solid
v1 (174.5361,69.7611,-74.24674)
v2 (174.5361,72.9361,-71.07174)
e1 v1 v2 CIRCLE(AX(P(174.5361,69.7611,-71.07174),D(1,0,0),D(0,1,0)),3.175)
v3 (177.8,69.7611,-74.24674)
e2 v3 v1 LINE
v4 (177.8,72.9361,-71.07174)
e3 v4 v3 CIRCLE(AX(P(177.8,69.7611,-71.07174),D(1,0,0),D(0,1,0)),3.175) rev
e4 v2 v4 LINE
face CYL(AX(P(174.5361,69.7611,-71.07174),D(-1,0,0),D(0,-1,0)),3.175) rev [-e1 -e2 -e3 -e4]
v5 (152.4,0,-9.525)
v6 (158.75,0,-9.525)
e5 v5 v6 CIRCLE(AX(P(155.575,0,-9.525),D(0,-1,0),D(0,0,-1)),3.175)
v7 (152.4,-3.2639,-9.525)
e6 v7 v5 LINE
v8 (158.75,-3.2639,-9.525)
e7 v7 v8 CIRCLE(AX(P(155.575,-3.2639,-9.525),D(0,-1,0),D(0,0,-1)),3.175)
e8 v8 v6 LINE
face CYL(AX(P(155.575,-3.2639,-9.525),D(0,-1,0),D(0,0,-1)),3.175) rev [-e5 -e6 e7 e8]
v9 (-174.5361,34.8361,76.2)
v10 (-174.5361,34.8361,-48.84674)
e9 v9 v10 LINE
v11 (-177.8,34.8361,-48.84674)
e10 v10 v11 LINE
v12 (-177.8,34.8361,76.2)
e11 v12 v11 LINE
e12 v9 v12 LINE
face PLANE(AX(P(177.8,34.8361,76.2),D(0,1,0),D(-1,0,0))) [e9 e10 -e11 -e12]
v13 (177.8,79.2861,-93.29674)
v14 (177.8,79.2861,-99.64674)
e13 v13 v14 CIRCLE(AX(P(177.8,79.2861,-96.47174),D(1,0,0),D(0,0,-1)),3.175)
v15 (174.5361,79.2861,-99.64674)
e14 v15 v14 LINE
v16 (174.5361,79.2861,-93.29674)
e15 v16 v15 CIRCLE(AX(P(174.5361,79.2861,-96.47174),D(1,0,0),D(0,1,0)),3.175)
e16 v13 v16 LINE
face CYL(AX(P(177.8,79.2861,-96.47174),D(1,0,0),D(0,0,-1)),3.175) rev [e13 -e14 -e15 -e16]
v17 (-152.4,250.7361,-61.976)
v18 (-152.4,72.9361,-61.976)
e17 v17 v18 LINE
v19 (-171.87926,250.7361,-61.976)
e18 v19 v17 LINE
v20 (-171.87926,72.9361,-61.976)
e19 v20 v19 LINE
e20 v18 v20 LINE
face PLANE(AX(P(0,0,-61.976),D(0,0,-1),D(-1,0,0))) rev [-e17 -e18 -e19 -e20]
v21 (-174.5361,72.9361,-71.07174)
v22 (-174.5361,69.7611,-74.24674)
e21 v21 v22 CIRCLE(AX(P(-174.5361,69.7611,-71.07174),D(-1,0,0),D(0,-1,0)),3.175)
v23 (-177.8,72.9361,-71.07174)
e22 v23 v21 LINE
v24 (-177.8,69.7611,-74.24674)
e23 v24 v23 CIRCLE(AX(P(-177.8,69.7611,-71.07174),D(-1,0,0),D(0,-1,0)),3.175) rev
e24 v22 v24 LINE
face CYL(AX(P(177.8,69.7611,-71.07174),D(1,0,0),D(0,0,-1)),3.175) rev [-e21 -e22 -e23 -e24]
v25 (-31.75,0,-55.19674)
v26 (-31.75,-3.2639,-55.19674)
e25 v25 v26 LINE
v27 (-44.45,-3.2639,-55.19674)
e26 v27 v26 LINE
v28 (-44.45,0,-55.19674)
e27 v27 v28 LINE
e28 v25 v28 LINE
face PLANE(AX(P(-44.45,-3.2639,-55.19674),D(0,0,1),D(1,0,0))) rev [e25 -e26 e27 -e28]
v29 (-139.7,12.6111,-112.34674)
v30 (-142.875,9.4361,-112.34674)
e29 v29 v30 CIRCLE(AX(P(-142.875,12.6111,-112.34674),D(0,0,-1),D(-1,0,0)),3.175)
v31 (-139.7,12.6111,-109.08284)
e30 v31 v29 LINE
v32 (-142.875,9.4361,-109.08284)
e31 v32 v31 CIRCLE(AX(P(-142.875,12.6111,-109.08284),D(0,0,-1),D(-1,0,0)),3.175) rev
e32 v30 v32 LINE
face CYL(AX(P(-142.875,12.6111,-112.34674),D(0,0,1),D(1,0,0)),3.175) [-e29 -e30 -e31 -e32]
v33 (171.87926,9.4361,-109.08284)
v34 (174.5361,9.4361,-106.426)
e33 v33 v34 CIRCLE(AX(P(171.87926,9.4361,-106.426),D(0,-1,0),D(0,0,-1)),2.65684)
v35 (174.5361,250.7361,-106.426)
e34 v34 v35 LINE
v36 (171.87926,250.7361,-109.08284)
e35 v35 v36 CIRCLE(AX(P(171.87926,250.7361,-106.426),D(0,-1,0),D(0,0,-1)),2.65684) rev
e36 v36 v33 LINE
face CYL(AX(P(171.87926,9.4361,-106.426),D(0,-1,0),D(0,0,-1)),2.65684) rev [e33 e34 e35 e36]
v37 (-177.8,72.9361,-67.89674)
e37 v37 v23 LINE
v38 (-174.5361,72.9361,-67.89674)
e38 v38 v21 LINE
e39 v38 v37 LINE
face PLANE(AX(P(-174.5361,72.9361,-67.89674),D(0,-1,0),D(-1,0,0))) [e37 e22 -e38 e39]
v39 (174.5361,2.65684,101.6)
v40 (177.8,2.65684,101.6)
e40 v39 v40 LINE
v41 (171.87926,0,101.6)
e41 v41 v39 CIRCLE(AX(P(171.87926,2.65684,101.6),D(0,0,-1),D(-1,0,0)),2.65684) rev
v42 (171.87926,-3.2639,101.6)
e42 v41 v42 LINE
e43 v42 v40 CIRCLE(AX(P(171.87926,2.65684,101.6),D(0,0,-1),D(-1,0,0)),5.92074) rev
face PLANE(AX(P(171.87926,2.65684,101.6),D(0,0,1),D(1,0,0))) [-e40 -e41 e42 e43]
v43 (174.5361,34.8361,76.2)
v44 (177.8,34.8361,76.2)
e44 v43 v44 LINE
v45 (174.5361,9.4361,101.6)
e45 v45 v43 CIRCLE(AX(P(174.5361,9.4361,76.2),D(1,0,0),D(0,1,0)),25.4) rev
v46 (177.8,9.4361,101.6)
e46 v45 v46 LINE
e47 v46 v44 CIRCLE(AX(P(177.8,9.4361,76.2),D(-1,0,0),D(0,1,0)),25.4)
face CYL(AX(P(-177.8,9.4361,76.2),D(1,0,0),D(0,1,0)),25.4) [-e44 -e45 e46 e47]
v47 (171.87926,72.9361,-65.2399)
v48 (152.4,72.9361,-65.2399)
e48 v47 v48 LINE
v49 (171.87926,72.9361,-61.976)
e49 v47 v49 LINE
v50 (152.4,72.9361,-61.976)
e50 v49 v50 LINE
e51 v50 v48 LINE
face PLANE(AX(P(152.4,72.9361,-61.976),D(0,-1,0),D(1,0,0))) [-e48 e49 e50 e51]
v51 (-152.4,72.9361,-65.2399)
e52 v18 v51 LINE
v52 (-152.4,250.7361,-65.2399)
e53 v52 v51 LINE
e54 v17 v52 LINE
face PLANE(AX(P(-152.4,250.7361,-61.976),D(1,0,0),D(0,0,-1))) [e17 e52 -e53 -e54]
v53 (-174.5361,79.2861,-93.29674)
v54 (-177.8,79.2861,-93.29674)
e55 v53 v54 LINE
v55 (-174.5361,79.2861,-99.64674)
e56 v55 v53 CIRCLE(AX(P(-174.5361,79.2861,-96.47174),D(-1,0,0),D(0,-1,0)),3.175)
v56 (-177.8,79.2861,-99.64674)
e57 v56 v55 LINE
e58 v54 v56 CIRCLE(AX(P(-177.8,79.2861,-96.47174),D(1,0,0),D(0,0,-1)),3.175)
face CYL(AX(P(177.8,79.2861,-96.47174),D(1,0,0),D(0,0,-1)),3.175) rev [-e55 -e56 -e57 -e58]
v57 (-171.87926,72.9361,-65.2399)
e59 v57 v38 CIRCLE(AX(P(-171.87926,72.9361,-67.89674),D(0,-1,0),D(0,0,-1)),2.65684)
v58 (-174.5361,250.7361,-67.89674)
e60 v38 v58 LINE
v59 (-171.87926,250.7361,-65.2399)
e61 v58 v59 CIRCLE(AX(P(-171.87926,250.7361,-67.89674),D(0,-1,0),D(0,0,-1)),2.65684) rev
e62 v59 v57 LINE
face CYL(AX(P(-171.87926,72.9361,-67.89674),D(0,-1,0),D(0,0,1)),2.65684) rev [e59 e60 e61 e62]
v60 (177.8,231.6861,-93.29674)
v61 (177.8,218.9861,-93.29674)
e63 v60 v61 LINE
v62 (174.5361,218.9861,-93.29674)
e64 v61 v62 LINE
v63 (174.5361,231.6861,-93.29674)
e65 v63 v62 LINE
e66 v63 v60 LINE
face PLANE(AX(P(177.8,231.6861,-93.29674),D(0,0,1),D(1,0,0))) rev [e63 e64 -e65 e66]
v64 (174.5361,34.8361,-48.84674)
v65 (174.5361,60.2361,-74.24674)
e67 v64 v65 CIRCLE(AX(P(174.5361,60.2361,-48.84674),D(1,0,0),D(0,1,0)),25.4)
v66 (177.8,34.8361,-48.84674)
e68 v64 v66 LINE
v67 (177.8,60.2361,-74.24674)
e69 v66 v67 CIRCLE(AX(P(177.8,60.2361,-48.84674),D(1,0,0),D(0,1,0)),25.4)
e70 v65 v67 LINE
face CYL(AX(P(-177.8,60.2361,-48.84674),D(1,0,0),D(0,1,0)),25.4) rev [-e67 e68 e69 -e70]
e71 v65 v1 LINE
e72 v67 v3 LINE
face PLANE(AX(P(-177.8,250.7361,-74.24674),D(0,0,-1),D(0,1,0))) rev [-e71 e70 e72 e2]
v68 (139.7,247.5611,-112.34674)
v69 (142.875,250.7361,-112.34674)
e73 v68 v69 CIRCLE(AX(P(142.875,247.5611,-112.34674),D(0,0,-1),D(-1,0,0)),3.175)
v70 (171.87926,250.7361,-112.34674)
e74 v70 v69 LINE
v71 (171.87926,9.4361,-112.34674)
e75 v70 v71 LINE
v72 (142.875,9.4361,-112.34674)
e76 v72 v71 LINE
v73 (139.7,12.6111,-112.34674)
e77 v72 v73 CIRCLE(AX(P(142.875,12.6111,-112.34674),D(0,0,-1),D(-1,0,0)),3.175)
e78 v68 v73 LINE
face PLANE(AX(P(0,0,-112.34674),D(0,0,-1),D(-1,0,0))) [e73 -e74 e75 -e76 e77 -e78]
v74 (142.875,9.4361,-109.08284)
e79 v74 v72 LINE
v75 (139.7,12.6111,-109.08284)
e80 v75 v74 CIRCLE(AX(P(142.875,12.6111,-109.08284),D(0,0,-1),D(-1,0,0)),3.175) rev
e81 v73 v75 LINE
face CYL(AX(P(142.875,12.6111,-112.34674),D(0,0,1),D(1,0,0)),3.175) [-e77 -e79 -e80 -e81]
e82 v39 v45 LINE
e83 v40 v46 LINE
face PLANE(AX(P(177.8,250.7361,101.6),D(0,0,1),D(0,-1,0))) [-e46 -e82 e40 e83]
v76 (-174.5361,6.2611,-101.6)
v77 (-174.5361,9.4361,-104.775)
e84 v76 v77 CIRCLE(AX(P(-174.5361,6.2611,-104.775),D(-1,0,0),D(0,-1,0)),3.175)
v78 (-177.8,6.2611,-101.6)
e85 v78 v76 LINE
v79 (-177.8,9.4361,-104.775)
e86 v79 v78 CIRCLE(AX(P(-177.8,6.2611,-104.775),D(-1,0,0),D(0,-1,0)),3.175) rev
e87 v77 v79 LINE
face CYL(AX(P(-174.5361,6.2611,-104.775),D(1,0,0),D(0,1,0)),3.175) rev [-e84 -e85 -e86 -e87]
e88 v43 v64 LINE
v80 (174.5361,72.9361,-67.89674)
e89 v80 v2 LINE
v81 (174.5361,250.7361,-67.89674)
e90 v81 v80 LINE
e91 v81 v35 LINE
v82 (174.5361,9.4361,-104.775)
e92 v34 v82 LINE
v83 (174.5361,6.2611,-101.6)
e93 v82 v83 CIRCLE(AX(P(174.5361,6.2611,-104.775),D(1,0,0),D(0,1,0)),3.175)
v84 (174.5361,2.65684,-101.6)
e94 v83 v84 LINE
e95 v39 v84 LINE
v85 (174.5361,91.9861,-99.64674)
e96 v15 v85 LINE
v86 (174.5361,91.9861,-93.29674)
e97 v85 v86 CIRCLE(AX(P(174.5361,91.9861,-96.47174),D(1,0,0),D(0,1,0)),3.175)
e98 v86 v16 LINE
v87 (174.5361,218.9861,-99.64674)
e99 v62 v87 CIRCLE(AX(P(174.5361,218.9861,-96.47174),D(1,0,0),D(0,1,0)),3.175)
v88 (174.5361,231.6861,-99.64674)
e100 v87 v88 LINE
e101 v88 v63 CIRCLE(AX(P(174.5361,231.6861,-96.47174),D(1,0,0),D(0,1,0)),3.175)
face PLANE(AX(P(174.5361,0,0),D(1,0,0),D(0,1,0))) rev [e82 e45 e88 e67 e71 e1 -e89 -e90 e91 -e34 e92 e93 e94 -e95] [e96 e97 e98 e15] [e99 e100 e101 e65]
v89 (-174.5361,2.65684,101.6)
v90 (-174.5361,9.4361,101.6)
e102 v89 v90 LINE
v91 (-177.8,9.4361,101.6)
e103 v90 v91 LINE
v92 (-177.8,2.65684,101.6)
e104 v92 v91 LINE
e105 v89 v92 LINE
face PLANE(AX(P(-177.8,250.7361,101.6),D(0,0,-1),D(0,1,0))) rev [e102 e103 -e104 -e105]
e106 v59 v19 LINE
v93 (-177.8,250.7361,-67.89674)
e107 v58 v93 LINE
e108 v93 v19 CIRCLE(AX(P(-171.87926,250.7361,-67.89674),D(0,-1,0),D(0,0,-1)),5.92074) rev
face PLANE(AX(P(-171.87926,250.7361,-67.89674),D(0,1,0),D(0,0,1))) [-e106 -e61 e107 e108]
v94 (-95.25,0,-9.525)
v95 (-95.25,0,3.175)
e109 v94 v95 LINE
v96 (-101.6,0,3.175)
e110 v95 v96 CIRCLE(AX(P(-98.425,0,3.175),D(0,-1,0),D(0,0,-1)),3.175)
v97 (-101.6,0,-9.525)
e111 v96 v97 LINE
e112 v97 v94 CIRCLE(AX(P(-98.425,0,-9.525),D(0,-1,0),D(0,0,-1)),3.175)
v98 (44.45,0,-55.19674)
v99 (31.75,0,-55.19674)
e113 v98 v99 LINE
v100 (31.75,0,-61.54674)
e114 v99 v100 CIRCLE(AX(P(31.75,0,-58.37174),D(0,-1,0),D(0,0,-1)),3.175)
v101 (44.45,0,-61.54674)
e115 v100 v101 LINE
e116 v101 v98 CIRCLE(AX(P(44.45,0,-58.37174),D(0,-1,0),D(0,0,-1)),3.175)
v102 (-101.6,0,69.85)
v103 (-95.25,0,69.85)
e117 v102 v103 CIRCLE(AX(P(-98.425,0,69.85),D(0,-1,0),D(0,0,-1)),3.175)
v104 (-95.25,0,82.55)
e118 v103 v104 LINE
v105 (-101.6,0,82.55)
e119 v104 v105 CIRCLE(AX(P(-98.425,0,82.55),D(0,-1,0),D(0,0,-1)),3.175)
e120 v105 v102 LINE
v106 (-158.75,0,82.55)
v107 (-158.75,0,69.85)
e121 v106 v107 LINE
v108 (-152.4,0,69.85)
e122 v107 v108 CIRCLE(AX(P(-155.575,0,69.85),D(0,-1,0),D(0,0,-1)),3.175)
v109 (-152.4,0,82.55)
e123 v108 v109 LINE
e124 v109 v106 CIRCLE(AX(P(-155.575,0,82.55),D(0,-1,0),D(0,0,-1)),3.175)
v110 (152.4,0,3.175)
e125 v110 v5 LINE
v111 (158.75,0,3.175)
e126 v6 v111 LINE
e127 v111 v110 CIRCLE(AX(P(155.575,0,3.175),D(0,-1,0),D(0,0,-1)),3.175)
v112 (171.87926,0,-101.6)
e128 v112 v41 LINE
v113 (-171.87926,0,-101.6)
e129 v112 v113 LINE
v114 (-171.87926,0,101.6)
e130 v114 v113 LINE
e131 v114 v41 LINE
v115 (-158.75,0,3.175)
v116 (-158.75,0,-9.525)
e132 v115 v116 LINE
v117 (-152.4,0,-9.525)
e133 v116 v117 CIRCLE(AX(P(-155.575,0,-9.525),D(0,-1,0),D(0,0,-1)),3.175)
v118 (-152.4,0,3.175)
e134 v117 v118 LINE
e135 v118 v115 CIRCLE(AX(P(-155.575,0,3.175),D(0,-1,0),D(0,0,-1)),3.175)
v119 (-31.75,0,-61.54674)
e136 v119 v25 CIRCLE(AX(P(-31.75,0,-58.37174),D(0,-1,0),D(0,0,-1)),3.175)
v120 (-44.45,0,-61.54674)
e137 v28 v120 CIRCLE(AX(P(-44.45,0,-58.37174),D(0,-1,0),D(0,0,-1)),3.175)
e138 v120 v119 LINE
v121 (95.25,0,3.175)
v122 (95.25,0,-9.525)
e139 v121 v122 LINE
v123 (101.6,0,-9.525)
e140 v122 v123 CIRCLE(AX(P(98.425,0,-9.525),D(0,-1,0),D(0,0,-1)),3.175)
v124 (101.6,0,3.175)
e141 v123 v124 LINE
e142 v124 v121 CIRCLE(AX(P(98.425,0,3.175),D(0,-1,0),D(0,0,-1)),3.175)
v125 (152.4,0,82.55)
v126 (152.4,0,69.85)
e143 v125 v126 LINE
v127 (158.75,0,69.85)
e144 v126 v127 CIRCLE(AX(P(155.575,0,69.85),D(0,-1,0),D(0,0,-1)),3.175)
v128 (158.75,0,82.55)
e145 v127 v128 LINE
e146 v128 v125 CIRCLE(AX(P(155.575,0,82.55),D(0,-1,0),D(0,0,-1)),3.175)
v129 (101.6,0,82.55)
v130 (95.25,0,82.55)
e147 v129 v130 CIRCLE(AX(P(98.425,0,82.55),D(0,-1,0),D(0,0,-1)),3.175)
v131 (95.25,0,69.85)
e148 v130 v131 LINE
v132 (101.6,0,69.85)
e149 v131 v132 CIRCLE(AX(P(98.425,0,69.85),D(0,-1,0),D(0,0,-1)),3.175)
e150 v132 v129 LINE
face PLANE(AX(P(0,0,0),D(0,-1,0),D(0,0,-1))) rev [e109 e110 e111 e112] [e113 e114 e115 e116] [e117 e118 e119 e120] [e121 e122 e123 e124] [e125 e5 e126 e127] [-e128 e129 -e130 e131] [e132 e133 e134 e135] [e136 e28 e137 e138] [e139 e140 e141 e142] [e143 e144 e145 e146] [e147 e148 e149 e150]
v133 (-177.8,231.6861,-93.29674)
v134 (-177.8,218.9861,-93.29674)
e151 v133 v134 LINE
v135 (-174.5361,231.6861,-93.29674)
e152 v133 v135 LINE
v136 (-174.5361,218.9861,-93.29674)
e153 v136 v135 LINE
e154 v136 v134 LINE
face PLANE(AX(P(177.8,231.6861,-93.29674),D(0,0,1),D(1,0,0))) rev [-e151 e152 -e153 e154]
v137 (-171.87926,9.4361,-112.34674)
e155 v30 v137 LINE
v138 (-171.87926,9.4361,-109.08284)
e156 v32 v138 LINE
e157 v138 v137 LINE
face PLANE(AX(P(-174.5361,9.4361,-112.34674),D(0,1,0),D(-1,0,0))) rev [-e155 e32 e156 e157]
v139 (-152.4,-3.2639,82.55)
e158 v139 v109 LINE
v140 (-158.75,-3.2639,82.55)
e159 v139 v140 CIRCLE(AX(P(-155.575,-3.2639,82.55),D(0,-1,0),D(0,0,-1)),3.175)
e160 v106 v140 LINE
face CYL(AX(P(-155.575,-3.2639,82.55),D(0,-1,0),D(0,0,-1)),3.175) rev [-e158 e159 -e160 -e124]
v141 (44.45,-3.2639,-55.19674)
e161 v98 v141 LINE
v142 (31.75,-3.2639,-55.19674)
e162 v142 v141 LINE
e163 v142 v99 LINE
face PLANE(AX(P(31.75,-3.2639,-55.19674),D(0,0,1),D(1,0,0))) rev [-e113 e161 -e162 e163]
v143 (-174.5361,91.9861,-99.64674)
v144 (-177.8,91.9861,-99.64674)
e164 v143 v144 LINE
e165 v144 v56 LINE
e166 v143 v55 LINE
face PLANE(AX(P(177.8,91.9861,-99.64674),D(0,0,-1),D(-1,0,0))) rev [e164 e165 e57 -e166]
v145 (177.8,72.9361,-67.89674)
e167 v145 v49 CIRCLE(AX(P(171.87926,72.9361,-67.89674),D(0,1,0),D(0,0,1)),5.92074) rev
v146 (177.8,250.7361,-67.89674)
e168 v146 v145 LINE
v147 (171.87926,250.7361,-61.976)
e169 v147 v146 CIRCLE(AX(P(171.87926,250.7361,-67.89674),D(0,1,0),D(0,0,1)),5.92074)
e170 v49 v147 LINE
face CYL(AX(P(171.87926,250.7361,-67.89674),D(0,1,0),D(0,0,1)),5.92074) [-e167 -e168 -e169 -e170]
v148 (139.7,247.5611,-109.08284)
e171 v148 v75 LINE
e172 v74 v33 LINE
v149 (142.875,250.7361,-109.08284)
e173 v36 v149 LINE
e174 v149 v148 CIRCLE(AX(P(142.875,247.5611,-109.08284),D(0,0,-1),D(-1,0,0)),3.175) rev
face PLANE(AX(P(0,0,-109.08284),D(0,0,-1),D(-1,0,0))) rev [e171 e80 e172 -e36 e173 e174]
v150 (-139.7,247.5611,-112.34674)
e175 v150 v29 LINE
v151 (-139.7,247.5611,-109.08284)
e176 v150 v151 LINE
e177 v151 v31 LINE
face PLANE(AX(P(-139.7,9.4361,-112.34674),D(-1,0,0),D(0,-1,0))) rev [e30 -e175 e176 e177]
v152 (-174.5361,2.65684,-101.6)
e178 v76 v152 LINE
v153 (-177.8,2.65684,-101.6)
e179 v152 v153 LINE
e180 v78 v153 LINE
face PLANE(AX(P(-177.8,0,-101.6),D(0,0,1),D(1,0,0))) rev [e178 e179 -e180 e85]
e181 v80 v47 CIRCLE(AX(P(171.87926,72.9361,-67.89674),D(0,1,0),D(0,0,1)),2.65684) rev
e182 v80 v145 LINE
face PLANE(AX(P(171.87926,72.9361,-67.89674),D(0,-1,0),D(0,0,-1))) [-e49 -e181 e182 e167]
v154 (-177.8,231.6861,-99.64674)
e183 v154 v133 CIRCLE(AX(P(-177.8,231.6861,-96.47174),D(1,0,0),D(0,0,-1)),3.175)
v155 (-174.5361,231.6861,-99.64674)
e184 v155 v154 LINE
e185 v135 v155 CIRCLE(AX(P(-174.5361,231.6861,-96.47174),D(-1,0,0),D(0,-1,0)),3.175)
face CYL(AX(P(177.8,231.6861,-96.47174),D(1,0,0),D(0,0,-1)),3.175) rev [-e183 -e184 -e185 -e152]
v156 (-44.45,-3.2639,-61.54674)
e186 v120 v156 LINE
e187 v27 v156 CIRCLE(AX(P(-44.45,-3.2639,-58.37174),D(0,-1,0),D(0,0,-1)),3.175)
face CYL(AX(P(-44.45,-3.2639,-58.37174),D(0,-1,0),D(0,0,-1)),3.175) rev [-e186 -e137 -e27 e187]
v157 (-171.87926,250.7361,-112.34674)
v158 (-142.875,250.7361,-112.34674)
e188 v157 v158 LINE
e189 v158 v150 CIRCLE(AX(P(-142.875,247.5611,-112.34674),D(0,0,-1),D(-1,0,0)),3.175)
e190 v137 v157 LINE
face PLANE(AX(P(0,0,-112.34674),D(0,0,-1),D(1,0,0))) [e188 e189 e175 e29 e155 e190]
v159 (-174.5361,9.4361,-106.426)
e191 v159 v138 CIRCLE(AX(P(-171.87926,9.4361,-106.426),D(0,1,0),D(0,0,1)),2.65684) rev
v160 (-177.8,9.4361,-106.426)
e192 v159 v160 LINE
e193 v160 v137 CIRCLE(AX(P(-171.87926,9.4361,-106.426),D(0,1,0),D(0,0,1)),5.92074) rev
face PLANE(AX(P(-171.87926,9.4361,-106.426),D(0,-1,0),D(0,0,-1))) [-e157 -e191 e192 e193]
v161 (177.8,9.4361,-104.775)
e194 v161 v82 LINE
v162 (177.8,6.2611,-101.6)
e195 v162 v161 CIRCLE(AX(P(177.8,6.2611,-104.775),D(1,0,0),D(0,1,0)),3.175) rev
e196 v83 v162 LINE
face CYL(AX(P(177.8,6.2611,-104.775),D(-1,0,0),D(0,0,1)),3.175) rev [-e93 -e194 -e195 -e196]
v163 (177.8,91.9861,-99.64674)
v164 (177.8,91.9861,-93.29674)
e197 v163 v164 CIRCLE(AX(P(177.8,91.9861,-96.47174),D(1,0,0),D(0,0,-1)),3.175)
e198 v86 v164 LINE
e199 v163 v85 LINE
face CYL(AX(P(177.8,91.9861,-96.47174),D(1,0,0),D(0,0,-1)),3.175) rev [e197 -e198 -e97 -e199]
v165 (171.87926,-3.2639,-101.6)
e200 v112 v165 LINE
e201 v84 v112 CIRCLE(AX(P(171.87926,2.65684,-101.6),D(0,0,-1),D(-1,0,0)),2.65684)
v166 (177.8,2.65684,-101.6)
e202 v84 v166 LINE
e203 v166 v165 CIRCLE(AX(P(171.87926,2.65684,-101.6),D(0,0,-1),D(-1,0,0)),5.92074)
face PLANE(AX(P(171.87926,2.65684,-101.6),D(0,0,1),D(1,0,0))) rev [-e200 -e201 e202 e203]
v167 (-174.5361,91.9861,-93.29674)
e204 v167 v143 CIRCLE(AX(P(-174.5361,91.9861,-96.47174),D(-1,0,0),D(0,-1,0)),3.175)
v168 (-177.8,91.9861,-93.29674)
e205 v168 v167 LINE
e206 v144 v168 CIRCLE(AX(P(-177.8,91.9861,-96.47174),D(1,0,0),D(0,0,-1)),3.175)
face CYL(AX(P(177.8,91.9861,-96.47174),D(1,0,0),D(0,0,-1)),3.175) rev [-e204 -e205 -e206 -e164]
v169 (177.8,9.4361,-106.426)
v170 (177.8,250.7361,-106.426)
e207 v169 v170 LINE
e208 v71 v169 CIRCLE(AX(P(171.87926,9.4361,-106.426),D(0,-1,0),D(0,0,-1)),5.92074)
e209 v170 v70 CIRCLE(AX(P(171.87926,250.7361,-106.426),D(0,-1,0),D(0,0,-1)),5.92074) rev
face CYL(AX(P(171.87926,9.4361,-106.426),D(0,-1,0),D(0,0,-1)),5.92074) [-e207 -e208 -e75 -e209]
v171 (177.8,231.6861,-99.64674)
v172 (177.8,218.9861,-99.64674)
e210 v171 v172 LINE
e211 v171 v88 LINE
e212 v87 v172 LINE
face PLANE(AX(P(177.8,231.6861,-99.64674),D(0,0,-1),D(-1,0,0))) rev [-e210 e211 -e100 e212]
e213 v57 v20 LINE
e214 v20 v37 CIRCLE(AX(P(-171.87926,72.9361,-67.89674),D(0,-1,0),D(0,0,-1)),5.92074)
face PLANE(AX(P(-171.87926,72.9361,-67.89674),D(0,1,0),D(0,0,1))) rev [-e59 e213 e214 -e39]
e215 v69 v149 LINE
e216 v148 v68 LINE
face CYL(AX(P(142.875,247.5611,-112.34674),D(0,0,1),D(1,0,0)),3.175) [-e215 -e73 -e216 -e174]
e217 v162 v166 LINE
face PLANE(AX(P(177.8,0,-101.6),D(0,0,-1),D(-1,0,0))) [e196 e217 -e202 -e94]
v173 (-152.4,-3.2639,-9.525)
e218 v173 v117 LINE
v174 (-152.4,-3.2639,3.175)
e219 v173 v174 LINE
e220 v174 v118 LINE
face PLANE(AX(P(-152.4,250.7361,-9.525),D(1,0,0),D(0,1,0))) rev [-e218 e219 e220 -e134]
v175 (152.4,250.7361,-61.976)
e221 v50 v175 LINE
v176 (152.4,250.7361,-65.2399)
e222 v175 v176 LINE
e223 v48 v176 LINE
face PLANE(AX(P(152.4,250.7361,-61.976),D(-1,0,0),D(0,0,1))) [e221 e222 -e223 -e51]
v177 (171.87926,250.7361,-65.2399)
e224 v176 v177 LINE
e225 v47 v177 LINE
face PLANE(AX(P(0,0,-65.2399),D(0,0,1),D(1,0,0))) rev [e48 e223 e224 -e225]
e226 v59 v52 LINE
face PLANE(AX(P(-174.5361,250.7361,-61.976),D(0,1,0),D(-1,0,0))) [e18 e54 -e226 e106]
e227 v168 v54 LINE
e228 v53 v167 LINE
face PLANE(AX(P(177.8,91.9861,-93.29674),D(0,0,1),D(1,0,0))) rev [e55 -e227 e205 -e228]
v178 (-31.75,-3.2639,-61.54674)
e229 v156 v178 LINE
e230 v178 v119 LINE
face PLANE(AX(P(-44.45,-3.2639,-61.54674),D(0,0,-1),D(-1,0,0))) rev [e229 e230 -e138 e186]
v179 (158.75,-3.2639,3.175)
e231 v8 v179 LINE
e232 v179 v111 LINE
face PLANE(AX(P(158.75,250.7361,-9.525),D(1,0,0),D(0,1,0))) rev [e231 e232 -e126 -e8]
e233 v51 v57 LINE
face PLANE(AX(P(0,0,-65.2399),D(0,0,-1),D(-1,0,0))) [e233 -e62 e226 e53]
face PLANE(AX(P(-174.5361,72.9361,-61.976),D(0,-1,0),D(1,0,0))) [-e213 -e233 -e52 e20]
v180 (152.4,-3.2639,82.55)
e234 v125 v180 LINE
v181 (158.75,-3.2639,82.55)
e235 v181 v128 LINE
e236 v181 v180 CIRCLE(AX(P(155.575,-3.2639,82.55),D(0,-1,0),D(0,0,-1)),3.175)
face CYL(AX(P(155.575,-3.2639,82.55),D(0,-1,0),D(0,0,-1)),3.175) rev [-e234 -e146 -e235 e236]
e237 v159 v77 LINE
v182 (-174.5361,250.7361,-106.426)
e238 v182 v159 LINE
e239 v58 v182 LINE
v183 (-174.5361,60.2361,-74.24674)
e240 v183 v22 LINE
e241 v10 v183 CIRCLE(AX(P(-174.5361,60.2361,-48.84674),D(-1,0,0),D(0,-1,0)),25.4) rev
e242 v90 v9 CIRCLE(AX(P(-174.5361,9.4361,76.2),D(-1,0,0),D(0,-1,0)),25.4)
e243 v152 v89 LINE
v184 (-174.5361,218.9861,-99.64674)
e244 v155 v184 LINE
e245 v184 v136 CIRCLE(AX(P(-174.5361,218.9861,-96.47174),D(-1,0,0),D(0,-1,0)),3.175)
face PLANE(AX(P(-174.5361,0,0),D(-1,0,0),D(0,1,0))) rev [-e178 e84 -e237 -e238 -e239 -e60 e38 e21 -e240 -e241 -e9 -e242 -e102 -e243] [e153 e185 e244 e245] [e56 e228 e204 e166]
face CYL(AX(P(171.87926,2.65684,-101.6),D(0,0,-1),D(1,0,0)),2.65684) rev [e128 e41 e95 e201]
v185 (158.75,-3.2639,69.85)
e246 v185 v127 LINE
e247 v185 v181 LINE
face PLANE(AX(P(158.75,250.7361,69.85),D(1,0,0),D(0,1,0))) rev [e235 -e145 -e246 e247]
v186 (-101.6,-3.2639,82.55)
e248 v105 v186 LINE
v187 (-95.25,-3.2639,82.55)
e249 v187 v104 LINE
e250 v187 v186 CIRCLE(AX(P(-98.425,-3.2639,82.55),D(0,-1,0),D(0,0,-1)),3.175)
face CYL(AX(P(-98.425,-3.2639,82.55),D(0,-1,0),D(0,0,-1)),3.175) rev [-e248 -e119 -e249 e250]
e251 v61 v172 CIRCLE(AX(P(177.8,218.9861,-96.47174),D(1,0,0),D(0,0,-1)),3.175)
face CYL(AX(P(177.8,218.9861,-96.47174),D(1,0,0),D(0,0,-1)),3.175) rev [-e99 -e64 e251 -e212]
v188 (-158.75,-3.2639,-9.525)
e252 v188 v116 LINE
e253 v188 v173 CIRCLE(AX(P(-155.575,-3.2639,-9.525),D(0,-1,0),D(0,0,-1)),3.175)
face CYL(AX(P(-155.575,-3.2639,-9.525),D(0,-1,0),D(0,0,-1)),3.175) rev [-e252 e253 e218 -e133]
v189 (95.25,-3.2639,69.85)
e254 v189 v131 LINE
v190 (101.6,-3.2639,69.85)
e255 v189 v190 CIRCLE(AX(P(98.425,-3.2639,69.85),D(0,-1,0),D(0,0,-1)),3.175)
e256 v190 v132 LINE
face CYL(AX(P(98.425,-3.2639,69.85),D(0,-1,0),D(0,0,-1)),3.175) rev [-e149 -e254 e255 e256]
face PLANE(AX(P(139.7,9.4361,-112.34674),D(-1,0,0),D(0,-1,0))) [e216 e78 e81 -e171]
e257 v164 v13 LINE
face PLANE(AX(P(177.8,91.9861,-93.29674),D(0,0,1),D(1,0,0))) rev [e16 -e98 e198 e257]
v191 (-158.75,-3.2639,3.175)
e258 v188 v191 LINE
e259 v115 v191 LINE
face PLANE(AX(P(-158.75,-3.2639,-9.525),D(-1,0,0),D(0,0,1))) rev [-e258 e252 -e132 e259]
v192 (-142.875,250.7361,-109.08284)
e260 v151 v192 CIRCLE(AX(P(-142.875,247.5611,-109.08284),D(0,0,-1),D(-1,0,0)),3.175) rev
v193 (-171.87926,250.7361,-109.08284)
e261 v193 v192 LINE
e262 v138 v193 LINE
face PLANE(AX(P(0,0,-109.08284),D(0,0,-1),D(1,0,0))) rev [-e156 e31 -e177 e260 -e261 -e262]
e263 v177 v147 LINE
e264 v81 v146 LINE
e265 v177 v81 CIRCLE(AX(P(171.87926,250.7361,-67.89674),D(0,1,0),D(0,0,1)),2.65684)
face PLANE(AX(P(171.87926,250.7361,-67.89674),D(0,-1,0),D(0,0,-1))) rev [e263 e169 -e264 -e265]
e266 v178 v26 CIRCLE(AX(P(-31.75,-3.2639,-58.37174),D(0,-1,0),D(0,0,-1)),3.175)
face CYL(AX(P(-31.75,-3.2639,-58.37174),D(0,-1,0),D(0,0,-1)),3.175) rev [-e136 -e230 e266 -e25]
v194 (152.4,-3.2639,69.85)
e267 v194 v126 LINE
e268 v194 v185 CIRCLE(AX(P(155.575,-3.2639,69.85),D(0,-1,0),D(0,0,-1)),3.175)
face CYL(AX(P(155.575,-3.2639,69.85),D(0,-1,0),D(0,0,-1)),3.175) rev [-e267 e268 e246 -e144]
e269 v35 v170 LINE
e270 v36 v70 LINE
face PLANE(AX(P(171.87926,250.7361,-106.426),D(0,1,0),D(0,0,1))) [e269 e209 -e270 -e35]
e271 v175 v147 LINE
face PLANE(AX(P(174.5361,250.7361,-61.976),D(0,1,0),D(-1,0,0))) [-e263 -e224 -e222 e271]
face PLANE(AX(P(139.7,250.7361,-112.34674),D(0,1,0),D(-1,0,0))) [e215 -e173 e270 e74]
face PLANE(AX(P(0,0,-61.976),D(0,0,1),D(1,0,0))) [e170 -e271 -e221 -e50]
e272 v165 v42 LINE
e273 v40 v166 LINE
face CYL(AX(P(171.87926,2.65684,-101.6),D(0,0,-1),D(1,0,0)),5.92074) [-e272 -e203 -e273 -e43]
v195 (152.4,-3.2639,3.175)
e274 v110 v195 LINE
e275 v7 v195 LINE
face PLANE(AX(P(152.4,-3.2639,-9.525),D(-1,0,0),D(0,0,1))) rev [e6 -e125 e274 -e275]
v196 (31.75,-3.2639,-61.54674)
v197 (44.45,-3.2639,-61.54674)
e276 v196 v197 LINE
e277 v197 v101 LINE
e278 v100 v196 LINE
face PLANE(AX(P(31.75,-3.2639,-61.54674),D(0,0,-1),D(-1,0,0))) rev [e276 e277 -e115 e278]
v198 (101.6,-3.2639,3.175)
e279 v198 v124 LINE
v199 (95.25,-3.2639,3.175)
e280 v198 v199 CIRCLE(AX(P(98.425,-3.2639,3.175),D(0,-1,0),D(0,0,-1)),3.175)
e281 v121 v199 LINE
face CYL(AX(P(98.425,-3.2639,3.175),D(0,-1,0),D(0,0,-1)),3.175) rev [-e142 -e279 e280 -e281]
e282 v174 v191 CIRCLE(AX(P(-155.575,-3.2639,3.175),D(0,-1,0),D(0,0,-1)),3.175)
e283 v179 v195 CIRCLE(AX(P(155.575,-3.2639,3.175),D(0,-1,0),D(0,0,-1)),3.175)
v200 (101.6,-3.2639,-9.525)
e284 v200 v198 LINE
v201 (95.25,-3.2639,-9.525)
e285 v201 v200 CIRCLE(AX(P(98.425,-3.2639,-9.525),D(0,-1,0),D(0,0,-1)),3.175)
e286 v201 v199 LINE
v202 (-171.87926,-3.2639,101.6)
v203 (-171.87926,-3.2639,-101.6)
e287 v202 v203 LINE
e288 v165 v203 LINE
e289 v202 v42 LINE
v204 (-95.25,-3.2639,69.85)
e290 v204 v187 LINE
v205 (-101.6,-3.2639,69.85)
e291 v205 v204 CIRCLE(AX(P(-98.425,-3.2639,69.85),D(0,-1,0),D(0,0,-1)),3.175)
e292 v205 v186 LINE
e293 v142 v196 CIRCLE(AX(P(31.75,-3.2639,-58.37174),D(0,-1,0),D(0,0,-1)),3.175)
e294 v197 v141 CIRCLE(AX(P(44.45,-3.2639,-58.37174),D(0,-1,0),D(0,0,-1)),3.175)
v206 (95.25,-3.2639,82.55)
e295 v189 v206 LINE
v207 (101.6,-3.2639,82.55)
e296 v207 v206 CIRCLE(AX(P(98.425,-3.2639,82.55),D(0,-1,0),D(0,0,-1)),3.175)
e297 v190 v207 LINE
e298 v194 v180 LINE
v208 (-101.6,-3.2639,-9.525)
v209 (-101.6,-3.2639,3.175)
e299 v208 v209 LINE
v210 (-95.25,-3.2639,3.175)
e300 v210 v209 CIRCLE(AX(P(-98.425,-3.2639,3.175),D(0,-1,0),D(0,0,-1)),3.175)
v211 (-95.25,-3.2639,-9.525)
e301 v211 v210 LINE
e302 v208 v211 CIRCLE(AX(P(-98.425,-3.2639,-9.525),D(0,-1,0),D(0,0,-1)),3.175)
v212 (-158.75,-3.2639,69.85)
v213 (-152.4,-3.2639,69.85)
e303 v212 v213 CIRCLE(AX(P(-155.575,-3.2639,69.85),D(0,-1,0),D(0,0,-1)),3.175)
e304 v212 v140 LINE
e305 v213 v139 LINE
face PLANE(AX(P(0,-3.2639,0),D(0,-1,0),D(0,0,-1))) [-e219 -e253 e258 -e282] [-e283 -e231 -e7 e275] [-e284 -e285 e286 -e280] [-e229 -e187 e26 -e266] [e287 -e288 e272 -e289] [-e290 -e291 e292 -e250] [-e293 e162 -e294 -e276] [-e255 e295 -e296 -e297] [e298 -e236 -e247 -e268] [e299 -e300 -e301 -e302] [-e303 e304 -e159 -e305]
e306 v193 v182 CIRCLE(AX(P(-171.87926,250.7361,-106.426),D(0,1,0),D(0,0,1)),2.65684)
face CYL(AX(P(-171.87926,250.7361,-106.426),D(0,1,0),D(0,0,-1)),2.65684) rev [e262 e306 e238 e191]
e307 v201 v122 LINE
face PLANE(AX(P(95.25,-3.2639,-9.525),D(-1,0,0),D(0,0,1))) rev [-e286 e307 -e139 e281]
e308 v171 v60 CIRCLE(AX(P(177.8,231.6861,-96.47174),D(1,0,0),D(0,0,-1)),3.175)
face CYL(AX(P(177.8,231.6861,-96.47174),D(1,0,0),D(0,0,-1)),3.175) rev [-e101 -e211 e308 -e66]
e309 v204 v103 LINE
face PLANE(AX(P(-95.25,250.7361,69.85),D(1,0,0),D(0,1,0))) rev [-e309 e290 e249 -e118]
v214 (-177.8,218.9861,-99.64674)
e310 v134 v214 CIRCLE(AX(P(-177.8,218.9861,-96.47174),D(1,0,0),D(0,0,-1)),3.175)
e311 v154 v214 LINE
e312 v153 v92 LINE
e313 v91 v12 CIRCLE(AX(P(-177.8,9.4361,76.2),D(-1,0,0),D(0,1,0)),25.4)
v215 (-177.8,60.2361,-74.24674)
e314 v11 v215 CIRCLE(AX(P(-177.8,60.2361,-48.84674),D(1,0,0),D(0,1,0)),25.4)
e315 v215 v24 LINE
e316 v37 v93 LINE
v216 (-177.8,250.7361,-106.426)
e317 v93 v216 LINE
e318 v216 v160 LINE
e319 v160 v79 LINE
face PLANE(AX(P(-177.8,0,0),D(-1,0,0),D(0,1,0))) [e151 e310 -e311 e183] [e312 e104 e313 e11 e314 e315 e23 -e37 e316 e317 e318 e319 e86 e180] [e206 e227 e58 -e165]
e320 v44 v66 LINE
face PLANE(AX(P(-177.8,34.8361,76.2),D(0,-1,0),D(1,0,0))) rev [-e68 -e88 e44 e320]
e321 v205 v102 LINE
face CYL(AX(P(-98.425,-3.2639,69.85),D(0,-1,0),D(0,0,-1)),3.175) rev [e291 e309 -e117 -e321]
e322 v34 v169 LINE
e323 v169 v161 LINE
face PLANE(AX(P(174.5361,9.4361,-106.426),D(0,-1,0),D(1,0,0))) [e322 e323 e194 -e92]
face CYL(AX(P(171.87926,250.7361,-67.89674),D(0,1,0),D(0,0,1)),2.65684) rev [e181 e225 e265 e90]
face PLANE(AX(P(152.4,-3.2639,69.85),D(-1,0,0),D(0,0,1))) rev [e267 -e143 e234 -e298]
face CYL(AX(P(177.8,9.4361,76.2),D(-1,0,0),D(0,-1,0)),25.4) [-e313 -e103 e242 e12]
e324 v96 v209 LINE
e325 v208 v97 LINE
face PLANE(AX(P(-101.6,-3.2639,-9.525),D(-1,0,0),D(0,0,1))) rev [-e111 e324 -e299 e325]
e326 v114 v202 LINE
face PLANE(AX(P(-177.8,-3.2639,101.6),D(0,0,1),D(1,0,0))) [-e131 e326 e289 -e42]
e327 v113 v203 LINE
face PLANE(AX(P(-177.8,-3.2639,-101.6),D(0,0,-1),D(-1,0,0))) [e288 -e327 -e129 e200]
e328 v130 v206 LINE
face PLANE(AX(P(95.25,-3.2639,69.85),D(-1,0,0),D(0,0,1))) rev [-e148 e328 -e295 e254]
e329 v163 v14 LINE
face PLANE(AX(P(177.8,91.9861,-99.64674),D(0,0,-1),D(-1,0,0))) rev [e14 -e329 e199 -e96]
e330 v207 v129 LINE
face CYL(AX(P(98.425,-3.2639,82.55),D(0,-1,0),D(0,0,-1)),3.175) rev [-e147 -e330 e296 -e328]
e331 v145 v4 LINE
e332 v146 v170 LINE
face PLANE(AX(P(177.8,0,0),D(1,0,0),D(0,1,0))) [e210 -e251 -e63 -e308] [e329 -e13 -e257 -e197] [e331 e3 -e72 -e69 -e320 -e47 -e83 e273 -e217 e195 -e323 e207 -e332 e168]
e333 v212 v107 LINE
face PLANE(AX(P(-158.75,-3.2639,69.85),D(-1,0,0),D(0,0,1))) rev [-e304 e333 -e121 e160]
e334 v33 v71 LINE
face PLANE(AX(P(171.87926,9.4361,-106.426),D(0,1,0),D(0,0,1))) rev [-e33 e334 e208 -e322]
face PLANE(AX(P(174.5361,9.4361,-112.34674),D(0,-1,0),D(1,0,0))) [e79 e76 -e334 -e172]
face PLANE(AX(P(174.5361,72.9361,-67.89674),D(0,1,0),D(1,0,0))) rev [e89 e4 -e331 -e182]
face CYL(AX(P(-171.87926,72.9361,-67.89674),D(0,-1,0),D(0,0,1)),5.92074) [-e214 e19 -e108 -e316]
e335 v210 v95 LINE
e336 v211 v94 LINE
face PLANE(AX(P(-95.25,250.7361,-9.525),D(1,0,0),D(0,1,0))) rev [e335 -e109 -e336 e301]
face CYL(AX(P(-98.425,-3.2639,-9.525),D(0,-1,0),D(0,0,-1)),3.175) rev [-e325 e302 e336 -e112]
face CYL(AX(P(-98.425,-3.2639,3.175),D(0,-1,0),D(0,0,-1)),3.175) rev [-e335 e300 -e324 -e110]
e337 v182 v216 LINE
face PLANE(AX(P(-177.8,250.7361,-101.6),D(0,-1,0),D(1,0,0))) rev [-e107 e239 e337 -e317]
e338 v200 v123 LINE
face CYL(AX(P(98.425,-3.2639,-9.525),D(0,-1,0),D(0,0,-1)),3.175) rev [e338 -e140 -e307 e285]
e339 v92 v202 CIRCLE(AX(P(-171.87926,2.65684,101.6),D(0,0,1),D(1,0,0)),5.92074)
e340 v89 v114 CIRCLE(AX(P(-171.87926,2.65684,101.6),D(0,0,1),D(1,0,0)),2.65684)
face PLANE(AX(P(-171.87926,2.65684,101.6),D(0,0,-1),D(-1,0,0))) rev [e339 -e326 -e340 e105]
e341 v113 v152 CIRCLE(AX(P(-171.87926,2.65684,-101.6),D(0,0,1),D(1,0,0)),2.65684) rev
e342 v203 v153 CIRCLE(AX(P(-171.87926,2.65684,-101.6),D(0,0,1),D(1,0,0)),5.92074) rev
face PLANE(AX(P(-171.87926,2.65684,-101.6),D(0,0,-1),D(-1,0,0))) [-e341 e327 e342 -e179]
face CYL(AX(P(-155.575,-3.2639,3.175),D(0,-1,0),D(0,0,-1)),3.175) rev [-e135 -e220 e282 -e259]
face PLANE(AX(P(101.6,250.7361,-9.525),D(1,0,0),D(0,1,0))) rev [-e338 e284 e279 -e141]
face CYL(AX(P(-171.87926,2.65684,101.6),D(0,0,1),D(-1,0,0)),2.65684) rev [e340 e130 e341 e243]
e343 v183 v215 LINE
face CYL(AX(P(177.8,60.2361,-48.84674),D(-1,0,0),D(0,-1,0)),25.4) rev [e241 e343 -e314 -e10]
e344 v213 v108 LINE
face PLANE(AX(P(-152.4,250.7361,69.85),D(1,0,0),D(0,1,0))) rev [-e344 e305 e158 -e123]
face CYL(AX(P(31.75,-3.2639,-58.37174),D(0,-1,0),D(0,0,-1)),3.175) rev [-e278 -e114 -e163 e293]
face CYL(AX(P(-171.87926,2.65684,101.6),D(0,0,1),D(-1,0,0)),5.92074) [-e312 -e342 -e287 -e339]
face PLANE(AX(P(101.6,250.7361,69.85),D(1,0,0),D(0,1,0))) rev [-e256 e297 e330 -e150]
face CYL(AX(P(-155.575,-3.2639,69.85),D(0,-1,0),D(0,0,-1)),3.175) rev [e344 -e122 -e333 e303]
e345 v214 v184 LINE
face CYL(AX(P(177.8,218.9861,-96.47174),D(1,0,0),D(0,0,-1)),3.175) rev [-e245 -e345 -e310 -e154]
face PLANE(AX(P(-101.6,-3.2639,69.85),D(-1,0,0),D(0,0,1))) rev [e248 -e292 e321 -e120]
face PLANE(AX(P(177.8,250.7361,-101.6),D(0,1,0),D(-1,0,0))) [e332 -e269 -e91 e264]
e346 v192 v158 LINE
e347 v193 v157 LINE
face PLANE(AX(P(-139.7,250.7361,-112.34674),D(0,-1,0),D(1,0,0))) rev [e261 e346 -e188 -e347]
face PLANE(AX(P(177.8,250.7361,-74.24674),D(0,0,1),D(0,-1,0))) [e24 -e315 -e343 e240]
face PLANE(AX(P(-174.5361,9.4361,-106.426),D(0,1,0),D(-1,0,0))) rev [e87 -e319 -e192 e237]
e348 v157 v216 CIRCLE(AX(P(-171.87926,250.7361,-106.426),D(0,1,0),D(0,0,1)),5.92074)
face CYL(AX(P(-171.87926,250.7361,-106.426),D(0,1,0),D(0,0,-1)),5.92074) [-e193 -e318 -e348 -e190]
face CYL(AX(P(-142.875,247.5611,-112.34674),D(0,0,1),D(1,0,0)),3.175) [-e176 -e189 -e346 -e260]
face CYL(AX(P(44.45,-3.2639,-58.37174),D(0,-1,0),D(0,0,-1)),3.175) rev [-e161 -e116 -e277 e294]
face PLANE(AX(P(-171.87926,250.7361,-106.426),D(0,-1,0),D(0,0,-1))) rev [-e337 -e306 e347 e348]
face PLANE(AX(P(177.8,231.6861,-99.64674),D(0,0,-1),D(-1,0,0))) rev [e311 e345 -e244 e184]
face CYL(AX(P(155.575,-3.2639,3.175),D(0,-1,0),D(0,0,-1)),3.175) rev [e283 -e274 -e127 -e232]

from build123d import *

# Parameters (mm, degrees)
SKETCH1_W                       = 355.6
SKETCH1_H                       = 203.2
BASE_FLANGE1_DEPTH              = 3.2639
EDGE_FLANGE1_STRIP_W            = 18.36928
EDGE_FLANGE1_STRIP_H            = 3.2639
EDGE_FLANGE1_STRIP_CUT_DEPTH    = 203.2
EDGE_FLANGE1_DEPTH              = 203.2
EDGE_FLANGE2_DEPTH              = 241.3
CUT_EXTRUDE1_DEPTH              = 450.37928505
EDGE_FLANGE3_DEPTH              = 177.8
EDGE_FLANGE3_BEND_DEPTH         = 177.8
FILLET1_R                       = 3.175
F_1_4_START                     = -177.8
F_1_4_0_25_DIAMETER_SLOT1_DEPTH = 355.6
F_1_4_START_2                   = -3.2639
F_1_4_0_25_DIAMETER_SLOT2_DEPTH = 3.2639
F_1_4_0_25_DIAMETER_SLOT3_DEPTH = 3.2639


# Read off the part's stored shape, not the designer's step: 1/4 (0.25) Diameter Slot1, 1/4 (0.25) Diameter Slot2, 1/4 (0.25) Diameter Slot3
# Sheet-metal steps are written as plain solids
with BuildPart() as part:
    # Sketch1 → Base-Flange1 (new body)
    with BuildSketch(Plane(origin=(0, 0, 0), x_dir=(1, 0, 0), z_dir=(0, 1, 0))):
        Rectangle(SKETCH1_W, SKETCH1_H)
    extrude(amount=-BASE_FLANGE1_DEPTH)

    # Edge-Flange1 strip (across the edge) → Edge-Flange1 strip cut (cut)
    with BuildSketch(Plane(origin=(177.8, 0, 101.6), x_dir=(-1, 0, 0), z_dir=(0, 0, -1))):
        with Locations((-3.2639, -1.63195)):
            Rectangle(EDGE_FLANGE1_STRIP_W, EDGE_FLANGE1_STRIP_H)
    edge_flange1_strip_cut = extrude(amount=EDGE_FLANGE1_STRIP_CUT_DEPTH, mode=Mode.SUBTRACT)

    # Edge-Flange1 section (across the edge) → Edge-Flange1 (add)
    with BuildSketch(Plane(origin=(177.8, 0, 101.6), x_dir=(-1, 0, 0), z_dir=(0, 0, -1))):
        with BuildLine():
            Line((0, 2.65684), (0, 250.7361))
            Line((0, 250.7361), (3.2639, 250.7361))
            Line((3.2639, 250.7361), (3.2639, 2.65684))
            ThreePointArc((3.2639, 2.65684), (4.042070419, 0.778170419), (5.92074, 0))
            Line((5.92074, 0), (5.92074, -3.2639))
            ThreePointArc((5.92074, -3.2639), (1.734144596, -1.529755404), (0, 2.65684))
        make_face()
    edge_flange1 = extrude(amount=EDGE_FLANGE1_DEPTH)

    # Edge-Flange2 section (across the edge) → Edge-Flange2 (add)
    with BuildSketch(Plane(origin=(174.5361, 250.7361, -109.08284), x_dir=(0, 0, 1), z_dir=(0, -1, 0))):
        with BuildLine():
            Line((-3.2639, 2.65684), (-3.2639, 34.8361))
            Line((-3.2639, 34.8361), (0, 34.8361))
            Line((0, 34.8361), (0, 2.65684))
            ThreePointArc((0, 2.65684), (0.778170419, 0.778170419), (2.65684, 0))
            Line((2.65684, 0), (7.48284, 0))
            Line((7.48284, 0), (7.48284, -3.2639))
            Line((7.48284, -3.2639), (2.65684, -3.2639))
            ThreePointArc((2.65684, -3.2639), (-1.529755404, -1.529755404), (-3.2639, 2.65684))
        make_face()
    edge_flange2 = extrude(amount=EDGE_FLANGE2_DEPTH)

    # Sketch14 → Cut-Extrude1 (cut, through all)
    with BuildSketch(Plane(origin=(177.8, 0, 0), x_dir=(0, 0, -1), z_dir=(1, 0, 0))):
        with BuildLine():
            Line((74.24674, 250.7361), (74.24674, 60.2361))
            ThreePointArc((74.24674, 60.2361), (66.807252242, 42.275587758), (48.84674, 34.8361))
            Line((48.84674, 34.8361), (-76.2, 34.8361))
            ThreePointArc((-76.2, 34.8361), (-94.160512242, 27.396612242), (-101.6, 9.4361))
            Line((-101.6, 9.4361), (-101.6, 250.7361))
            Line((-101.6, 250.7361), (74.24674, 250.7361))
        make_face()
    cut_extrude1 = extrude(amount=-CUT_EXTRUDE1_DEPTH, mode=Mode.SUBTRACT)

    # Mirror1: Edge-Flange1 strip cut, Edge-Flange1, Edge-Flange2, Cut-Extrude1 across plane
    add(edge_flange1_strip_cut.mirror(Plane(origin=(0, 0, 0), x_dir=(0, 0, 1), z_dir=(1, 0, 0))), mode=Mode.SUBTRACT)
    add(edge_flange1.mirror(Plane(origin=(0, 0, 0), x_dir=(0, 0, 1), z_dir=(1, 0, 0))))
    add(edge_flange2.mirror(Plane(origin=(0, 0, 0), x_dir=(0, 0, 1), z_dir=(1, 0, 0))))
    add(cut_extrude1.mirror(Plane(origin=(0, 0, 0), x_dir=(0, 0, 1), z_dir=(1, 0, 0))), mode=Mode.SUBTRACT)

    # Edge-Flange3 section (across the edge) → Edge-Flange3 (add)
    with BuildSketch(Plane(origin=(174.5361, 72.9361, -65.2399), x_dir=(0, 0, -1), z_dir=(0, 1, 0))):
        with BuildLine():
            Line((-3.2639, 2.65684), (-3.2639, 22.1361))
            Line((-3.2639, 22.1361), (0, 22.1361))
            Line((0, 22.1361), (0, 2.65684))
            ThreePointArc((0, 2.65684), (0.778170419, 0.778170419), (2.65684, 0))
            Line((2.65684, 0), (9.00684, 0))
            Line((9.00684, 0), (9.00684, -3.2639))
            Line((9.00684, -3.2639), (2.65684, -3.2639))
            ThreePointArc((2.65684, -3.2639), (-1.529755404, -1.529755404), (-3.2639, 2.65684))
        make_face()
    extrude(amount=EDGE_FLANGE3_DEPTH)

    # Edge-Flange3 section 2 (across the edge) → Edge-Flange3 bend (add)
    with BuildSketch(Plane(origin=(-174.5361, 250.7361, -65.2399), x_dir=(0, 0, -1), z_dir=(0, -1, 0))):
        with BuildLine():
            Line((-3.2639, 2.65684), (-3.2639, 22.1361))
            Line((-3.2639, 22.1361), (0, 22.1361))
            Line((0, 22.1361), (0, 2.65684))
            ThreePointArc((0, 2.65684), (0.778170419, 0.778170419), (2.65684, 0))
            Line((2.65684, 0), (9.00684, 0))
            Line((9.00684, 0), (9.00684, -3.2639))
            Line((9.00684, -3.2639), (2.65684, -3.2639))
            ThreePointArc((2.65684, -3.2639), (-1.529755404, -1.529755404), (-3.2639, 2.65684))
        make_face()
    extrude(amount=EDGE_FLANGE3_BEND_DEPTH)

    # Fillet1
    fillet1_edges = [part.edges().sort_by_distance(p)[0] for p in [
        (-176.16805, 9.4361, -101.6),
        (-139.7, 9.4361, -110.71479),
        (-139.7, 250.7361, -110.71479),
        (176.16805, 72.9361, -74.24674),
        (-176.16805, 72.9361, -74.24674),
        (176.16805, 9.4361, -101.6),
        (139.7, 250.7361, -110.71479),
        (139.7, 9.4361, -110.71479),
    ]]
    fillet(fillet1_edges, radius=FILLET1_R)

    # 1/4 (0.25) Diameter Slot1 outline → 1/4 (0.25) Diameter Slot1 (cut)
    with BuildSketch(Plane.YZ.offset(F_1_4_START)):
        with BuildLine():
            Line((79.2861, -99.64674), (91.9861, -99.64674))
            ThreePointArc((91.9861, -99.64674), (95.1611, -96.47174), (91.9861, -93.29674))
            Line((91.9861, -93.29674), (79.2861, -93.29674))
            ThreePointArc((79.2861, -93.29674), (76.1111, -96.47174), (79.2861, -99.64674))
        make_face()
        with BuildLine():
            ThreePointArc((231.6861, -99.64674), (234.8611, -96.47174), (231.6861, -93.29674))
            Line((231.6861, -93.29674), (218.9861, -93.29674))
            ThreePointArc((218.9861, -93.29674), (215.8111, -96.47174), (218.9861, -99.64674))
            Line((218.9861, -99.64674), (231.6861, -99.64674))
        make_face()
    extrude(amount=F_1_4_0_25_DIAMETER_SLOT1_DEPTH, mode=Mode.SUBTRACT)

    # 1/4 (0.25) Diameter Slot2 outline → 1/4 (0.25) Diameter Slot2 (cut)
    with BuildSketch(Plane(origin=(0, 0, 0), x_dir=(1, 0, 0), z_dir=(0, 1, 0)).offset(F_1_4_START_2)):
        with BuildLine():
            ThreePointArc((95.25, -3.175), (98.425, -6.35), (101.6, -3.175))
            Line((101.6, -3.175), (101.6, 9.525))
            ThreePointArc((101.6, 9.525), (98.425, 12.7), (95.25, 9.525))
            Line((95.25, 9.525), (95.25, -3.175))
        make_face()
        with BuildLine():
            ThreePointArc((101.6, -69.85), (98.425, -66.675), (95.25, -69.85))
            Line((95.25, -69.85), (95.25, -82.55))
            ThreePointArc((95.25, -82.55), (98.425, -85.725), (101.6, -82.55))
            Line((101.6, -82.55), (101.6, -69.85))
        make_face()
        with BuildLine():
            ThreePointArc((158.75, -69.85), (155.575, -66.675), (152.4, -69.85))
            Line((152.4, -69.85), (152.4, -82.55))
            ThreePointArc((152.4, -82.55), (155.575, -85.725), (158.75, -82.55))
            Line((158.75, -82.55), (158.75, -69.85))
        make_face()
        with BuildLine():
            ThreePointArc((158.75, 9.525), (155.575, 12.7), (152.4, 9.525))
            Line((152.4, 9.525), (152.4, -3.175))
            ThreePointArc((152.4, -3.175), (155.575, -6.35), (158.75, -3.175))
            Line((158.75, -3.175), (158.75, 9.525))
        make_face()
    f_1_4_0_25_diameter_slot2 = extrude(amount=F_1_4_0_25_DIAMETER_SLOT2_DEPTH, mode=Mode.SUBTRACT)

    # Mirror2: 1/4 (0.25) Diameter Slot2 across plane
    add(f_1_4_0_25_diameter_slot2.mirror(Plane(origin=(0, 0, 0), x_dir=(0, 0, 1), z_dir=(1, 0, 0))), mode=Mode.SUBTRACT)

    # 1/4 (0.25) Diameter Slot3 outline → 1/4 (0.25) Diameter Slot3 (cut)
    with BuildSketch(Plane(origin=(0, 0, 0), x_dir=(1, 0, 0), z_dir=(0, 1, 0)).offset(F_1_4_START_2)):
        with BuildLine():
            ThreePointArc((-44.45, 61.54674), (-47.625, 58.37174), (-44.45, 55.19674))
            Line((-44.45, 55.19674), (-31.75, 55.19674))
            ThreePointArc((-31.75, 55.19674), (-28.575, 58.37174), (-31.75, 61.54674))
            Line((-31.75, 61.54674), (-44.45, 61.54674))
        make_face()
        with BuildLine():
            ThreePointArc((44.45, 55.19674), (47.625, 58.37174), (44.45, 61.54674))
            Line((44.45, 61.54674), (31.75, 61.54674))
            ThreePointArc((31.75, 61.54674), (28.575, 58.37174), (31.75, 55.19674))
            Line((31.75, 55.19674), (44.45, 55.19674))
        make_face()
    extrude(amount=F_1_4_0_25_DIAMETER_SLOT3_DEPTH, mode=Mode.SUBTRACT)


solid = part.part
